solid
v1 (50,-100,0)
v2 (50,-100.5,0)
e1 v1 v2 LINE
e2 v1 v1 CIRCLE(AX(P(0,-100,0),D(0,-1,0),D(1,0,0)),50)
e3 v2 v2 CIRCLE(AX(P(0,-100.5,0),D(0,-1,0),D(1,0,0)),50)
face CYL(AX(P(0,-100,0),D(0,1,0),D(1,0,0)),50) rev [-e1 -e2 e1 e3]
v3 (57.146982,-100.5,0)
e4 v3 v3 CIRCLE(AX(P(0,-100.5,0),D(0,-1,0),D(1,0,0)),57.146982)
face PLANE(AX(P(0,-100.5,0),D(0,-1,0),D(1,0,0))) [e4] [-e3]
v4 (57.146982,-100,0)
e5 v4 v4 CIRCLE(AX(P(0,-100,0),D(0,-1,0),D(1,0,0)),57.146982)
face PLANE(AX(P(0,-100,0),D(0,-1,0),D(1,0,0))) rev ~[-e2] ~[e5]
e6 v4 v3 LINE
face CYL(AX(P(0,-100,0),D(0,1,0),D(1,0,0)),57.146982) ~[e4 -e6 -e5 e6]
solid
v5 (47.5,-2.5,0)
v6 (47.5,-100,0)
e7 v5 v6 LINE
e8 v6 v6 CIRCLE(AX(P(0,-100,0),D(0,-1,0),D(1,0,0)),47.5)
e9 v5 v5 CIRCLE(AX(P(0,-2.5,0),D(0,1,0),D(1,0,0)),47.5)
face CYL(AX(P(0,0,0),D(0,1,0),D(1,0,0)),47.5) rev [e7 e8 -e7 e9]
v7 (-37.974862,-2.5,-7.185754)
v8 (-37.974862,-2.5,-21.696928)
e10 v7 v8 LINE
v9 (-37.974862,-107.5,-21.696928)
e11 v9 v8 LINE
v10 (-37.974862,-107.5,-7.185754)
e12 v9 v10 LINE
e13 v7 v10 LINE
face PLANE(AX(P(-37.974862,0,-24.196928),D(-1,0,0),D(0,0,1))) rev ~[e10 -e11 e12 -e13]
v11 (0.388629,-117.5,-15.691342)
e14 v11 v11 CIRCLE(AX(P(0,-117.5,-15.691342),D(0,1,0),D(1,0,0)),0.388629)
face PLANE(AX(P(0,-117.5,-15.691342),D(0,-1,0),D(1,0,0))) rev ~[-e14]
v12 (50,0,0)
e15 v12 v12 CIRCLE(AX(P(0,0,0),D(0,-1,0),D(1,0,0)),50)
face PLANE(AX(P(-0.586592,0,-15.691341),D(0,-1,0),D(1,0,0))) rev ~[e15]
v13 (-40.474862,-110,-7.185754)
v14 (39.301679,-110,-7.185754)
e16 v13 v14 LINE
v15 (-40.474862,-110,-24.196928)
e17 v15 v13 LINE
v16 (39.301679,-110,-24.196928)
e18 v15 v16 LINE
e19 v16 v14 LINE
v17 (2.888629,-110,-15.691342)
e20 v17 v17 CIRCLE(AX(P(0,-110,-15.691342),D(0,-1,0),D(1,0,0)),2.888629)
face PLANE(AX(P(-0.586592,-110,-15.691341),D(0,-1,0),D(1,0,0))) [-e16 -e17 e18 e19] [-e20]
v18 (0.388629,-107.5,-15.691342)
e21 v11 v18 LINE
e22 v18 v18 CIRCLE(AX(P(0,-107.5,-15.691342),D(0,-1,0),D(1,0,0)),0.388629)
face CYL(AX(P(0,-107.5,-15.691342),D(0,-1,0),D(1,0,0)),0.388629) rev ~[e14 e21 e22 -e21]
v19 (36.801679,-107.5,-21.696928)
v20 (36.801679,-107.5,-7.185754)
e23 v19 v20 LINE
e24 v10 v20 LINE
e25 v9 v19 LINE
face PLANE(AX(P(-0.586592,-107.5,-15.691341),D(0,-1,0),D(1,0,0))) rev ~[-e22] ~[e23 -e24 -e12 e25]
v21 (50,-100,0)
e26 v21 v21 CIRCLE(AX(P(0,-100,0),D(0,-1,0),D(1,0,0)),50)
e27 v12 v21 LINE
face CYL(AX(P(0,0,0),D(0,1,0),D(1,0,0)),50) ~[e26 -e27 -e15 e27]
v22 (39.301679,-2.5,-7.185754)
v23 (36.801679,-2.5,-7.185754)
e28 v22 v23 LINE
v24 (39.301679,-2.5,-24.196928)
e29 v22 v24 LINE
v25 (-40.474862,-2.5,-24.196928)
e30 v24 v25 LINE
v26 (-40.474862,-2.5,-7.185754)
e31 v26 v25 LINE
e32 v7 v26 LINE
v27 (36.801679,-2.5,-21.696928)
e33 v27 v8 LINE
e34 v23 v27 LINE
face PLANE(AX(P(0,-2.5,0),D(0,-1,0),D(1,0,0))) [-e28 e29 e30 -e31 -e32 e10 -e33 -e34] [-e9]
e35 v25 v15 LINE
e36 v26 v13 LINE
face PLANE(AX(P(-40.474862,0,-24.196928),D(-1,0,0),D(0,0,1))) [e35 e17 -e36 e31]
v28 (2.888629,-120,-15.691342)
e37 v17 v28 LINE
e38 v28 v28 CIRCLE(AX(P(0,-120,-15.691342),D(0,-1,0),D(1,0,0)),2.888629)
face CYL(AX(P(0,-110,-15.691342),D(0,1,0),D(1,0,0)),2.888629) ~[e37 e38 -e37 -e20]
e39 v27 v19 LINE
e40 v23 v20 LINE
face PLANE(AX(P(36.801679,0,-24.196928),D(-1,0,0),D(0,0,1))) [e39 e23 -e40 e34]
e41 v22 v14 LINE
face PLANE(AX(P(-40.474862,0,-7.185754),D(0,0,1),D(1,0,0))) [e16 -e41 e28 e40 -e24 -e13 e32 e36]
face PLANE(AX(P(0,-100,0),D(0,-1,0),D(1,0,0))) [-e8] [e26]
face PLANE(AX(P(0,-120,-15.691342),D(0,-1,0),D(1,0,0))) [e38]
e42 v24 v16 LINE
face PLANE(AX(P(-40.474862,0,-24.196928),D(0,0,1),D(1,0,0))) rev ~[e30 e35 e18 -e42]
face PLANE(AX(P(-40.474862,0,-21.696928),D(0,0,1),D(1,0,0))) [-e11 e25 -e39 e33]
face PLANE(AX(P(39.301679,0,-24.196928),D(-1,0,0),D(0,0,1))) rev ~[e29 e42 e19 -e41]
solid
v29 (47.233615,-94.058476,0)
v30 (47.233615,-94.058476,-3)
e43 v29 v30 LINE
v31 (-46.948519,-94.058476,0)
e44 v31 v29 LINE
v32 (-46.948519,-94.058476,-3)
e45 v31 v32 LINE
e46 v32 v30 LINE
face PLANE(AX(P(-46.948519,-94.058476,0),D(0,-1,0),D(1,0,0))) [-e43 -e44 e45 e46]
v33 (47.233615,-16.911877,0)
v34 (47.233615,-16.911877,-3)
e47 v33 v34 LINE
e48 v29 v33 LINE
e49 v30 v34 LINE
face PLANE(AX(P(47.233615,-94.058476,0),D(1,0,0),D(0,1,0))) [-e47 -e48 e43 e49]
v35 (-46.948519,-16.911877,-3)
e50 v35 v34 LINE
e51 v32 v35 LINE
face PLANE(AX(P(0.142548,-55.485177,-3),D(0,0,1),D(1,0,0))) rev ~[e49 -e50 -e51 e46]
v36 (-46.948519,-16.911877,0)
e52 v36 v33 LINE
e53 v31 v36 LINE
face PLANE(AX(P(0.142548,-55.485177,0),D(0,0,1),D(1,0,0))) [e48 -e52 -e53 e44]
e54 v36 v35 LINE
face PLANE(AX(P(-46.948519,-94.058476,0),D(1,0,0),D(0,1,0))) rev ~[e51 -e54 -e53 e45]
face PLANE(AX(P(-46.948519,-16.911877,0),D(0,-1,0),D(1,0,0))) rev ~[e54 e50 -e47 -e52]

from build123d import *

# Parameters (mm, degrees)
F0_R         = 50
F1_DEPTH     = 100
F2_T         = -2.5
F3_W         = 94.1821336746
F3_H         = 77.1465990692
F4_DEPTH     = 3
F7_W         = 79.7765403986
F7_H         = 17.0111740008
F8_DEPTH     = 110
F9_R         = 2.8886289283
F10_DEPTH    = 10
F12_T        = 2.5
F12_T3_DEPTH = 22.0111740008
F12_T5_DEPTH = 84.7765403986
F13_R        = 57.146981612
F13_R_2      = 50
F14_DEPTH    = 0.5


# Not quite as in the source:
# - a shell that OpenCascade refuses in one call is made with other operations: the cavity is built on its own and cut out
# - a feature names something its author has since deleted; it is built from what else it names
# - the program builds the solid bodies; features that only make, move or delete a surface that nothing else refers to are left out


with BuildPart() as f1:
    # F0 (on Front) → F1 (new body)
    with BuildSketch(Plane.XZ):
        Circle(F0_R)
    extrude(amount=F1_DEPTH)

    # F2
    f2_openings = [f1.faces().sort_by_distance(p)[0] for p in [
        (0, -100, 0),
    ]]
    offset(amount=F2_T, openings=f2_openings)

    # F7 (on Front) → F8 (join)
    with BuildSketch(Plane.XZ):
        with Locations((-0.586591661, -15.6913413666)):
            Rectangle(F7_W, F7_H)
    extrude(amount=F8_DEPTH)

    # F9 (on face) → F10 (join)
    with BuildSketch(Plane.XZ.offset(110)):
        with Locations((0, -15.6913418323)):
            Circle(F9_R)
    extrude(amount=F10_DEPTH)

    # F12: shell of thickness 2.5, made by hand


with BuildPart() as f4:
    # F3 (on Top) → F4 (new body)
    with BuildSketch(Plane.XY):
        with Locations((0.1425482333, -55.4851768538)):
            Rectangle(F3_W, F3_H)
    extrude(amount=-F4_DEPTH)


with BuildPart() as f12_core1:
    # F12_t2: copy of F1
    add(f1.part)

    # the walls: a layer under each face that stays
    f12_faces = [f12_core1.faces().sort_by_distance(p)[0] for p in [
        (-50, -50, 0),
        (0, 0, 0),
        (-46.6666666667, -100, -13.3333333333),
        (-47.5, -51.25, 0),
        (0, -2.5, 0),
        (-40.4748618603, -56.25, -15.6913413666),
        (-0.586591661, -56.25, -24.196928367),
        (39.3016785383, -56.25, -15.6913413666),
        (-27.1787717938, -110, -21.3617327002),
        (-2.8886289283, -115, -15.6913418323),
        (0, -120, -15.6913418323),
    ]]
    thicken(f12_faces, amount=-F12_T, mode=Mode.SUBTRACT)

    # F12_s4 → F12_t3 (cut)
    with BuildSketch(Plane.XY.offset(-26.696928367)):
        Polygon((-40.4998618603, -2.525), (-40.4748618603, 0), (-37.9748618603, 0), (-37.9748618603, -2.5), align=None)
        Polygon((39.3266785383, -2.525), (39.3016785383, 0), (36.8016785383, 0), (36.8016785383, -2.5), align=None)
    extrude(amount=F12_T3_DEPTH, mode=Mode.SUBTRACT)

    # F12_s6 → F12_t5 (cut)
    with BuildSketch(Plane.YZ.offset(-42.9748618603)):
        Polygon((-2.525, -24.221928367), (0, -24.196928367), (0, -21.696928367), (-2.5, -21.696928367), align=None)
    extrude(amount=F12_T5_DEPTH, mode=Mode.SUBTRACT)

    # F12_s7 → F12_t8 (revolve, cut)
    with BuildSketch(Plane.XY):
        Polygon((47.475, -2.525), (50, -2.5), (50, 0), (47.5, 0), align=None)
    revolve(axis=Axis((0, -2.5, 0), (0, 1, 0)), mode=Mode.SUBTRACT)

    # F12_s9 → F12_t10 (revolve, cut)
    with BuildSketch(Plane.XY.offset(-15.6913418323)):
        Polygon((2.9136289283, -110.025), (2.8886289283, -107.5), (0.3886289283, -107.5), (0.3886289283, -110), align=None)
    revolve(axis=Axis((0, -110, -15.6913418323), (0, -1, 0)), mode=Mode.SUBTRACT)


with BuildPart() as f1_1:
    add(f1.part)

    # what is left inside the walls is the cavity
    f12_cavity = [f12_core1.part.solids().sort_by_distance(p)[0] for p in [
        (-0.586592, -72.5, -7.210754),
    ]]
    add(f12_cavity, mode=Mode.SUBTRACT)


with BuildPart() as f14:
    # F13 (on face) → F14 (new body)
    with BuildSketch(Plane.XZ.offset(100)):
        Circle(F13_R)
        Circle(F13_R_2, mode=Mode.SUBTRACT)
    extrude(amount=F14_DEPTH)


solid = Compound([f4.part, f1_1.part, f14.part])
